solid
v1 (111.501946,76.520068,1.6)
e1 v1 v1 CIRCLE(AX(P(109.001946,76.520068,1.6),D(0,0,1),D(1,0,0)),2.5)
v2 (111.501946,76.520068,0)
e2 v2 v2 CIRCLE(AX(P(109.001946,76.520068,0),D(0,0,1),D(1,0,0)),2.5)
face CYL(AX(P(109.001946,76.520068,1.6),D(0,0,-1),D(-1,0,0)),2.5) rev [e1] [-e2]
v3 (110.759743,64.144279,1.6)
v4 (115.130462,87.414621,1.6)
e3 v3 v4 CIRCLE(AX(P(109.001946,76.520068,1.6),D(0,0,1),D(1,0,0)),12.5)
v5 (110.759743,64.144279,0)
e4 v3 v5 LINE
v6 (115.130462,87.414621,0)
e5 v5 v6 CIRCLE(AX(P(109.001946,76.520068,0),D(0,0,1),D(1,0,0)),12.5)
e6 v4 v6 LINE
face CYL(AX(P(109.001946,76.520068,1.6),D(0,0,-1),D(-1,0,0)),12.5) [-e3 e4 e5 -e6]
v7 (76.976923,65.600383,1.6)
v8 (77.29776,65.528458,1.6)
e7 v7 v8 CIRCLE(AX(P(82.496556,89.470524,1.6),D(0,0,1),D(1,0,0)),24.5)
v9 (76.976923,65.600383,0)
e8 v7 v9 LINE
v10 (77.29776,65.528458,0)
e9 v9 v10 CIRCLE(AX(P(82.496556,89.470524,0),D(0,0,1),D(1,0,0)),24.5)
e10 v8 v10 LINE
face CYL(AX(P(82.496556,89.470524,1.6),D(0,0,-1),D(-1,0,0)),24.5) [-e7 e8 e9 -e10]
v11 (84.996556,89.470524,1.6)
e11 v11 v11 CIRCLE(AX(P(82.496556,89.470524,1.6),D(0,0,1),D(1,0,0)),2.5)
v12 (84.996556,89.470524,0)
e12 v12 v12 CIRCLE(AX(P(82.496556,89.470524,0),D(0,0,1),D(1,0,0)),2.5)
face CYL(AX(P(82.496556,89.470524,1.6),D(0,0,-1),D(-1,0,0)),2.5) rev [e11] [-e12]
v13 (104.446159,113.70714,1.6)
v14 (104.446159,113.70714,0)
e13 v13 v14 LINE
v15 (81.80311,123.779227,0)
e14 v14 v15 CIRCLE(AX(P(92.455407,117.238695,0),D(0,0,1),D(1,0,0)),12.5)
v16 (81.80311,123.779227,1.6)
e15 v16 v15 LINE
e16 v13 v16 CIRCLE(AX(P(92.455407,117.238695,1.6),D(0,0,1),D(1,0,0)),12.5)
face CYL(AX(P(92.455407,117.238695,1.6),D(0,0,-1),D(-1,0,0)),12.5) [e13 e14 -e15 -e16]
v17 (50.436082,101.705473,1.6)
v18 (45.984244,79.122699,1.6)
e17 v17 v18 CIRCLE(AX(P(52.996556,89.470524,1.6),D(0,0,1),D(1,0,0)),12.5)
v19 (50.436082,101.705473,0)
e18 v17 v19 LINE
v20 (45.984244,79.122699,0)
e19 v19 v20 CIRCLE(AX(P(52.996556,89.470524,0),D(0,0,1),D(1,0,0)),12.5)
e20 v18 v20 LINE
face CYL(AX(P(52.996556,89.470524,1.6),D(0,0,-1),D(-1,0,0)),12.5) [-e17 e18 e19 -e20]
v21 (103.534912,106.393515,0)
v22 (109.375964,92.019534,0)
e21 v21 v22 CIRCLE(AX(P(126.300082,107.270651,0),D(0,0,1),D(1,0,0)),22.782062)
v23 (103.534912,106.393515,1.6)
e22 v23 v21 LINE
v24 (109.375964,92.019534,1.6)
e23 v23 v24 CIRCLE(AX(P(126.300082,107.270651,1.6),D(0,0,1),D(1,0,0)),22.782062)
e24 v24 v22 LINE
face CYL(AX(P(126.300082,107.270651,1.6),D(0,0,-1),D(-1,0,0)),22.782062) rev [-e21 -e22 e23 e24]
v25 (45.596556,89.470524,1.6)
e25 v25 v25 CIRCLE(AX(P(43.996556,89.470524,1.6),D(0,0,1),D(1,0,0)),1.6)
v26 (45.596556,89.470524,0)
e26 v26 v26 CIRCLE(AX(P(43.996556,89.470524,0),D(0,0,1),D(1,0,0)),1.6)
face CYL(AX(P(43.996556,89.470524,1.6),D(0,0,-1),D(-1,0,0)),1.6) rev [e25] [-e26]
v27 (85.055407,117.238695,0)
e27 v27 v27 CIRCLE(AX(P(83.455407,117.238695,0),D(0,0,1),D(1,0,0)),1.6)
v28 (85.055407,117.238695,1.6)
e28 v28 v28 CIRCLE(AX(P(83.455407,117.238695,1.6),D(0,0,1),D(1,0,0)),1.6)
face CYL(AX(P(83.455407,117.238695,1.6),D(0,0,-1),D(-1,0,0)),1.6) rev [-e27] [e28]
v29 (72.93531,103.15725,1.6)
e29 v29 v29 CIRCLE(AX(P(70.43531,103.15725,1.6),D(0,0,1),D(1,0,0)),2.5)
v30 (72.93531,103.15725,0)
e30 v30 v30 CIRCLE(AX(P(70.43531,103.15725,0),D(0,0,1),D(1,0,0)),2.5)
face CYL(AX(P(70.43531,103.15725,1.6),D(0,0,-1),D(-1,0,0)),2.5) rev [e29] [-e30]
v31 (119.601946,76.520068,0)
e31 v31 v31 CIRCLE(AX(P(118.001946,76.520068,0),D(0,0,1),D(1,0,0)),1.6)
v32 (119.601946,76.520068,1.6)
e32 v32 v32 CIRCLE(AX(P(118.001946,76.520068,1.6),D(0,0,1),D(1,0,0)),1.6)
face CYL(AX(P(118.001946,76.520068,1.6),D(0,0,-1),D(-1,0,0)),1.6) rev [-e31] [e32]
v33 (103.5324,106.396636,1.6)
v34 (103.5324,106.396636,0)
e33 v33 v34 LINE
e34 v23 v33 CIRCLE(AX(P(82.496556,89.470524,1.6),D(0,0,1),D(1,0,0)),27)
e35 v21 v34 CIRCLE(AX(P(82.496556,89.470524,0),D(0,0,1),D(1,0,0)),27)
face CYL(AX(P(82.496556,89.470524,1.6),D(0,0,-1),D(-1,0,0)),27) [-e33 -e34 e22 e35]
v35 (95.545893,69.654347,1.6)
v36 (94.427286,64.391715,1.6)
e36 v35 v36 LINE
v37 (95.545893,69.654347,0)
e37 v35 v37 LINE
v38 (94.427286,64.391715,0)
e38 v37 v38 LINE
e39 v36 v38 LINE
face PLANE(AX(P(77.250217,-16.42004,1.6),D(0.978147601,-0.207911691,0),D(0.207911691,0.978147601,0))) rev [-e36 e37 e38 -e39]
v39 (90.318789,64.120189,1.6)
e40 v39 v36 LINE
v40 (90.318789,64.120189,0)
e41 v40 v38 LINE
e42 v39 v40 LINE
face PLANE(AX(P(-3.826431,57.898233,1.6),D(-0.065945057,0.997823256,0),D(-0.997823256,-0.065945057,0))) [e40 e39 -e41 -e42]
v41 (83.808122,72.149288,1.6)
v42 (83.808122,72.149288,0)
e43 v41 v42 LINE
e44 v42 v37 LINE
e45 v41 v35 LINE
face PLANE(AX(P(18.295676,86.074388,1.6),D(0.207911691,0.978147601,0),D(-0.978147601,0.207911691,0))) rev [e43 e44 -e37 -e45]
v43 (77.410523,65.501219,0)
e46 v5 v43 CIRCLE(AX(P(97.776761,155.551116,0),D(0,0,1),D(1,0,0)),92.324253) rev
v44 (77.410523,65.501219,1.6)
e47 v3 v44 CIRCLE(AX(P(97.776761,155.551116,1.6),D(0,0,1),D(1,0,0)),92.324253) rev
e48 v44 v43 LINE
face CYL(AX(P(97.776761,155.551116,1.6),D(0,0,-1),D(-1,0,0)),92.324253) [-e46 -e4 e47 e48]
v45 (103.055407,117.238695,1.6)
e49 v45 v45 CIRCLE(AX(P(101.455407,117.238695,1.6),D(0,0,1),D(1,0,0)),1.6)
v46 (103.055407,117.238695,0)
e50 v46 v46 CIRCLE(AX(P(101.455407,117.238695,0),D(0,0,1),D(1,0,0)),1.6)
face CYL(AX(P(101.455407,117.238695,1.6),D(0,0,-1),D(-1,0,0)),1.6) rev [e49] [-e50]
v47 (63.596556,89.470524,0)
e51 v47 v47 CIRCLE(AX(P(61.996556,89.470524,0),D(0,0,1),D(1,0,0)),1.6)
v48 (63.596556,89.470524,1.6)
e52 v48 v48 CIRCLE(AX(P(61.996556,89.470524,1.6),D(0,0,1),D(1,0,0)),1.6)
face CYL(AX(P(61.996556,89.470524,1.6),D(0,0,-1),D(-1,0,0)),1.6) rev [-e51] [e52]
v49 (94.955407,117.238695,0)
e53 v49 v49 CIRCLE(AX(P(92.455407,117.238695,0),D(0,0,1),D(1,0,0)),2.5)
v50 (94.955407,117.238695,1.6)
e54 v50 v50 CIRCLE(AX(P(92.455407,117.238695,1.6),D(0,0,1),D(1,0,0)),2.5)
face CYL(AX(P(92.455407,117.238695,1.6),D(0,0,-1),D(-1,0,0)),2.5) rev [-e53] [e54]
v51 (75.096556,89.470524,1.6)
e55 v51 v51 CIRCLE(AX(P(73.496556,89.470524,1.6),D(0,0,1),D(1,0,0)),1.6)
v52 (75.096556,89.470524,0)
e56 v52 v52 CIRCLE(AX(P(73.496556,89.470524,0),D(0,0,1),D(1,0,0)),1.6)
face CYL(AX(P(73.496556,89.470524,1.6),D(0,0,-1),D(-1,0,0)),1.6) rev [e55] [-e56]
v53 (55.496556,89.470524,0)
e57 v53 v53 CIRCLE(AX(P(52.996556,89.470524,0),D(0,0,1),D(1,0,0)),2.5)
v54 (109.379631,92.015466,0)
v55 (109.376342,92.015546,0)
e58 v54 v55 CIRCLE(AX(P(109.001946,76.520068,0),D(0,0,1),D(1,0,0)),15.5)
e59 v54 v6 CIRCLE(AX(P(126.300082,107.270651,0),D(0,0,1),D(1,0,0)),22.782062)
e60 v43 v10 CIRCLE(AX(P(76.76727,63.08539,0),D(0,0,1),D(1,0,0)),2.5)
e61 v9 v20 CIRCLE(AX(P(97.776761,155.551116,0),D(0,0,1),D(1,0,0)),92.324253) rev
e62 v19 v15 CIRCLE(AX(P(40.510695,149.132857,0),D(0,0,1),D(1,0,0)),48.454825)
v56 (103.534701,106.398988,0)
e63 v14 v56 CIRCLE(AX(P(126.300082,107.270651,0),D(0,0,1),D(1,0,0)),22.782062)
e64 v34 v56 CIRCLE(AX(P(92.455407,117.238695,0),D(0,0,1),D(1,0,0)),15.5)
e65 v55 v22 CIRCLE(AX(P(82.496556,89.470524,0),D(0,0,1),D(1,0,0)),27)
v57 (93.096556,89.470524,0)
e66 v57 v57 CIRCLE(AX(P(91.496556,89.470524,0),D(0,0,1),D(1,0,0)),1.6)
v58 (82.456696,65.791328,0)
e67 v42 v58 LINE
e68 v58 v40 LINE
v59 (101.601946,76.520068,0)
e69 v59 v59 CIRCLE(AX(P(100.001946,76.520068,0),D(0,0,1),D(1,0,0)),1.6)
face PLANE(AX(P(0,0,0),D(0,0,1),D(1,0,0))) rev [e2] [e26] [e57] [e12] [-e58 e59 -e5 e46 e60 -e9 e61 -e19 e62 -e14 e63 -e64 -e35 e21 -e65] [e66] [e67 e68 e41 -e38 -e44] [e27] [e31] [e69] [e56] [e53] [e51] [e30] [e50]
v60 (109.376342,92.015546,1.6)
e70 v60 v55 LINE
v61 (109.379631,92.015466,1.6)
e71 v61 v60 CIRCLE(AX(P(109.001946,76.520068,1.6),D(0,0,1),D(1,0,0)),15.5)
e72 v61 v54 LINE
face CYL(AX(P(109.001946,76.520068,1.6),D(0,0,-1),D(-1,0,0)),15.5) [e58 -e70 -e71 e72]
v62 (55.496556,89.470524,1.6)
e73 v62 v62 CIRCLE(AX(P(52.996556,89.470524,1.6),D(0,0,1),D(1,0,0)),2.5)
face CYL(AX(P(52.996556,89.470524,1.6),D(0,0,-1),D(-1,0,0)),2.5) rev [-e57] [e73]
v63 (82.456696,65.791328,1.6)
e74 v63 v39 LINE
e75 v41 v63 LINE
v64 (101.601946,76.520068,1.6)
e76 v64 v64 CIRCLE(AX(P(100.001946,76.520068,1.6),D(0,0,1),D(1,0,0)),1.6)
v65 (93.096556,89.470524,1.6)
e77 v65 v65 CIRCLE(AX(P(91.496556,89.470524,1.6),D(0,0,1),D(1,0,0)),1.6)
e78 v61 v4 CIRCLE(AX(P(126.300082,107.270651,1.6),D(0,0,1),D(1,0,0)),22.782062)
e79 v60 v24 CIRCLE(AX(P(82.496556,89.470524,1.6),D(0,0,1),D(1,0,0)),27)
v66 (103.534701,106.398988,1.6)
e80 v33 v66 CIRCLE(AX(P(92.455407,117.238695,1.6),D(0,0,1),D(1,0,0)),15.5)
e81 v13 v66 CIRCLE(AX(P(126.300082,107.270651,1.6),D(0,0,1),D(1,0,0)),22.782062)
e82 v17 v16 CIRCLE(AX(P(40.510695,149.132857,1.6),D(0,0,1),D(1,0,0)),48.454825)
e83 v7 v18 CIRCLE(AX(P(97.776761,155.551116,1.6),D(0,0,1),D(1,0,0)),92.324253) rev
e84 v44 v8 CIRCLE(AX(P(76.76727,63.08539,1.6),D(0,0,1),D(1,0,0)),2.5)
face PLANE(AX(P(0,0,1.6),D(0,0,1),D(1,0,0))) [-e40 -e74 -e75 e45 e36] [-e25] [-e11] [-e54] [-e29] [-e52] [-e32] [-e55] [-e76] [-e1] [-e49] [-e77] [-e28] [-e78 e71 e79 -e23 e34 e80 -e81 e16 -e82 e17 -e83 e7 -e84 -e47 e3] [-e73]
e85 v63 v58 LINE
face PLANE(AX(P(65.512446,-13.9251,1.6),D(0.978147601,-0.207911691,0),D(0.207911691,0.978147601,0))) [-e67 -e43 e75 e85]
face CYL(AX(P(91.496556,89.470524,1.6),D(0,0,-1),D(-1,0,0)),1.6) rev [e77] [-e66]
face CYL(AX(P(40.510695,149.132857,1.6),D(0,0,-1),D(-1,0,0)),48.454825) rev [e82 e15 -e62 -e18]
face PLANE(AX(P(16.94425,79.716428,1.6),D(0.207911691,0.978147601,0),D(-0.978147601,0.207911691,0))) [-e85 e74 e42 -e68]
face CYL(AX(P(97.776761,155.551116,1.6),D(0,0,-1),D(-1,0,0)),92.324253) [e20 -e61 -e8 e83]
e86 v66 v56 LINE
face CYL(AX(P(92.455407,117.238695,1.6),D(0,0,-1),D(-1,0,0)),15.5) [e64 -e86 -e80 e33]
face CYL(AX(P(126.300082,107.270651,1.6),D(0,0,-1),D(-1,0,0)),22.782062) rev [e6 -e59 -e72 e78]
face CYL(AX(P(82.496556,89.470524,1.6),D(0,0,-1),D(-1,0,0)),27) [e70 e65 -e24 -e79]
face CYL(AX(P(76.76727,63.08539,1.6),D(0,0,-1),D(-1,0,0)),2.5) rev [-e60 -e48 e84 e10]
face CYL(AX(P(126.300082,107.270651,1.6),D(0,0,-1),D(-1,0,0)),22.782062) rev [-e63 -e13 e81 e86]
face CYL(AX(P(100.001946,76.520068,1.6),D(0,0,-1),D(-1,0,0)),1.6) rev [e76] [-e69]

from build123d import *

# Parameters (mm, degrees)
BOSS_EXTRUDE1_DEPTH = 1.6
SKETCH8_3_R         = 2.5
CUT_EXTRUDE1_DEPTH  = 178.756608161
SKETCH25_R          = 2.5
CUT_EXTRUDE2_DEPTH  = 178.756608161
SKETCH16_R          = 1.6
CUT_EXTRUDE3_DEPTH  = 178.756608161
CUT_EXTRUDE6_DEPTH  = 175.275284078


with BuildPart() as part:
    # Sketch8 → Boss-Extrude1 (new body)
    with BuildSketch(Plane.XY):
        with BuildLine():
            ThreePointArc((103.534701401, 106.398987898), (103.693161759, 110.090138371), (104.446158593, 113.707139515))
            ThreePointArc((104.446158593, 113.707139515), (97.535722451, 128.659745128), (81.803110207, 123.779227301))
            ThreePointArc((81.803110207, 123.779227301), (68.396685685, 109.506582784), (50.436082024, 101.705472858))
            ThreePointArc((50.436082024, 101.705472858), (40.732585656, 91.888172428), (45.984244445, 79.122699094))
            ThreePointArc((45.984244445, 79.122699094), (60.856228216, 70.93053968), (76.976923111, 65.600382715))
            ThreePointArc((76.976923111, 65.600382715), (77.137220348, 65.563882378), (77.2977589, 65.528458486))
            ThreePointArc((77.2977589, 65.528458486), (77.354298773, 65.515492739), (77.410522602, 65.501218676))
            ThreePointArc((77.410522602, 65.501218676), (94.023303804, 63.303193357), (110.759742778, 64.144278965))
            ThreePointArc((110.759742778, 64.144278965), (121.287127646, 74.212620667), (115.130462452, 87.414620912))
            ThreePointArc((115.130462452, 87.414620912), (112.067901623, 89.481121015), (109.379631064, 92.015465685))
            ThreePointArc((109.379631064, 92.015465685), (109.377986421, 92.015505684), (109.376341775, 92.015545509))
            ThreePointArc((109.376341775, 92.015545509), (109.37615287, 92.017539878), (109.375963817, 92.019534234))
            ThreePointArc((109.375963817, 92.019534234), (105.194093866, 98.693961054), (103.534911629, 106.393514545))
            ThreePointArc((103.534911629, 106.393514545), (103.533655951, 106.395075463), (103.532400156, 106.396636288))
            ThreePointArc((103.532400156, 106.396636288), (103.533550841, 106.397812032), (103.534701401, 106.398987898))
        make_face()
    extrude(amount=BOSS_EXTRUDE1_DEPTH)

    # Sketch8<3> → Cut-Extrude1 (cut, through all)
    with BuildSketch(Plane.XY):
        with Locations((70.435309654, 103.157249982)):
            Circle(SKETCH8_3_R)
    extrude(amount=CUT_EXTRUDE1_DEPTH, mode=Mode.SUBTRACT)

    # Sketch25 → Cut-Extrude2 (cut, through all)
    with BuildSketch(Plane.XY):
        with Locations((52.996556322, 89.470524089)):
            Circle(SKETCH25_R)
        with Locations((82.496556322, 89.470524089)):
            Circle(SKETCH25_R)
        with Locations((92.45540719, 117.238694526)):
            Circle(SKETCH25_R)
        with Locations((109.001946024, 76.520067852)):
            Circle(SKETCH25_R)
    extrude(amount=CUT_EXTRUDE2_DEPTH, mode=Mode.SUBTRACT)

    # Sketch16 → Cut-Extrude3 (cut, through all)
    with BuildSketch(Plane.XY):
        with Locations((43.996556322, 89.470524089)):
            Circle(SKETCH16_R)
        with Locations((61.996556322, 89.470524089)):
            Circle(SKETCH16_R)
        with Locations((73.496556322, 89.470524089)):
            Circle(SKETCH16_R)
        with Locations((91.496556322, 89.470524089)):
            Circle(SKETCH16_R)
        with Locations((100.001946024, 76.520067852)):
            Circle(SKETCH16_R)
        with Locations((118.001946024, 76.520067852)):
            Circle(SKETCH16_R)
        with Locations((83.45540719, 117.238694526)):
            Circle(SKETCH16_R)
        with Locations((101.45540719, 117.238694526)):
            Circle(SKETCH16_R)
    extrude(amount=CUT_EXTRUDE3_DEPTH, mode=Mode.SUBTRACT)

    # Sketch23 → Cut-Extrude6 (cut, through all)
    with BuildSketch(Plane(origin=(-19.097367964, 26.776820286, 0), x_dir=(0.9781476007338056, -0.2079116908177598, 0), z_dir=(0, 0, 1))):
        Polygon((103.223291241, 65.776224437), (91.223291241, 65.776224437), (91.223291241, 59.276224437), (99.26102874, 59.276224437), (103.223291241, 60.39602146), align=None)
    extrude(amount=CUT_EXTRUDE6_DEPTH, mode=Mode.SUBTRACT)


solid = part.part
